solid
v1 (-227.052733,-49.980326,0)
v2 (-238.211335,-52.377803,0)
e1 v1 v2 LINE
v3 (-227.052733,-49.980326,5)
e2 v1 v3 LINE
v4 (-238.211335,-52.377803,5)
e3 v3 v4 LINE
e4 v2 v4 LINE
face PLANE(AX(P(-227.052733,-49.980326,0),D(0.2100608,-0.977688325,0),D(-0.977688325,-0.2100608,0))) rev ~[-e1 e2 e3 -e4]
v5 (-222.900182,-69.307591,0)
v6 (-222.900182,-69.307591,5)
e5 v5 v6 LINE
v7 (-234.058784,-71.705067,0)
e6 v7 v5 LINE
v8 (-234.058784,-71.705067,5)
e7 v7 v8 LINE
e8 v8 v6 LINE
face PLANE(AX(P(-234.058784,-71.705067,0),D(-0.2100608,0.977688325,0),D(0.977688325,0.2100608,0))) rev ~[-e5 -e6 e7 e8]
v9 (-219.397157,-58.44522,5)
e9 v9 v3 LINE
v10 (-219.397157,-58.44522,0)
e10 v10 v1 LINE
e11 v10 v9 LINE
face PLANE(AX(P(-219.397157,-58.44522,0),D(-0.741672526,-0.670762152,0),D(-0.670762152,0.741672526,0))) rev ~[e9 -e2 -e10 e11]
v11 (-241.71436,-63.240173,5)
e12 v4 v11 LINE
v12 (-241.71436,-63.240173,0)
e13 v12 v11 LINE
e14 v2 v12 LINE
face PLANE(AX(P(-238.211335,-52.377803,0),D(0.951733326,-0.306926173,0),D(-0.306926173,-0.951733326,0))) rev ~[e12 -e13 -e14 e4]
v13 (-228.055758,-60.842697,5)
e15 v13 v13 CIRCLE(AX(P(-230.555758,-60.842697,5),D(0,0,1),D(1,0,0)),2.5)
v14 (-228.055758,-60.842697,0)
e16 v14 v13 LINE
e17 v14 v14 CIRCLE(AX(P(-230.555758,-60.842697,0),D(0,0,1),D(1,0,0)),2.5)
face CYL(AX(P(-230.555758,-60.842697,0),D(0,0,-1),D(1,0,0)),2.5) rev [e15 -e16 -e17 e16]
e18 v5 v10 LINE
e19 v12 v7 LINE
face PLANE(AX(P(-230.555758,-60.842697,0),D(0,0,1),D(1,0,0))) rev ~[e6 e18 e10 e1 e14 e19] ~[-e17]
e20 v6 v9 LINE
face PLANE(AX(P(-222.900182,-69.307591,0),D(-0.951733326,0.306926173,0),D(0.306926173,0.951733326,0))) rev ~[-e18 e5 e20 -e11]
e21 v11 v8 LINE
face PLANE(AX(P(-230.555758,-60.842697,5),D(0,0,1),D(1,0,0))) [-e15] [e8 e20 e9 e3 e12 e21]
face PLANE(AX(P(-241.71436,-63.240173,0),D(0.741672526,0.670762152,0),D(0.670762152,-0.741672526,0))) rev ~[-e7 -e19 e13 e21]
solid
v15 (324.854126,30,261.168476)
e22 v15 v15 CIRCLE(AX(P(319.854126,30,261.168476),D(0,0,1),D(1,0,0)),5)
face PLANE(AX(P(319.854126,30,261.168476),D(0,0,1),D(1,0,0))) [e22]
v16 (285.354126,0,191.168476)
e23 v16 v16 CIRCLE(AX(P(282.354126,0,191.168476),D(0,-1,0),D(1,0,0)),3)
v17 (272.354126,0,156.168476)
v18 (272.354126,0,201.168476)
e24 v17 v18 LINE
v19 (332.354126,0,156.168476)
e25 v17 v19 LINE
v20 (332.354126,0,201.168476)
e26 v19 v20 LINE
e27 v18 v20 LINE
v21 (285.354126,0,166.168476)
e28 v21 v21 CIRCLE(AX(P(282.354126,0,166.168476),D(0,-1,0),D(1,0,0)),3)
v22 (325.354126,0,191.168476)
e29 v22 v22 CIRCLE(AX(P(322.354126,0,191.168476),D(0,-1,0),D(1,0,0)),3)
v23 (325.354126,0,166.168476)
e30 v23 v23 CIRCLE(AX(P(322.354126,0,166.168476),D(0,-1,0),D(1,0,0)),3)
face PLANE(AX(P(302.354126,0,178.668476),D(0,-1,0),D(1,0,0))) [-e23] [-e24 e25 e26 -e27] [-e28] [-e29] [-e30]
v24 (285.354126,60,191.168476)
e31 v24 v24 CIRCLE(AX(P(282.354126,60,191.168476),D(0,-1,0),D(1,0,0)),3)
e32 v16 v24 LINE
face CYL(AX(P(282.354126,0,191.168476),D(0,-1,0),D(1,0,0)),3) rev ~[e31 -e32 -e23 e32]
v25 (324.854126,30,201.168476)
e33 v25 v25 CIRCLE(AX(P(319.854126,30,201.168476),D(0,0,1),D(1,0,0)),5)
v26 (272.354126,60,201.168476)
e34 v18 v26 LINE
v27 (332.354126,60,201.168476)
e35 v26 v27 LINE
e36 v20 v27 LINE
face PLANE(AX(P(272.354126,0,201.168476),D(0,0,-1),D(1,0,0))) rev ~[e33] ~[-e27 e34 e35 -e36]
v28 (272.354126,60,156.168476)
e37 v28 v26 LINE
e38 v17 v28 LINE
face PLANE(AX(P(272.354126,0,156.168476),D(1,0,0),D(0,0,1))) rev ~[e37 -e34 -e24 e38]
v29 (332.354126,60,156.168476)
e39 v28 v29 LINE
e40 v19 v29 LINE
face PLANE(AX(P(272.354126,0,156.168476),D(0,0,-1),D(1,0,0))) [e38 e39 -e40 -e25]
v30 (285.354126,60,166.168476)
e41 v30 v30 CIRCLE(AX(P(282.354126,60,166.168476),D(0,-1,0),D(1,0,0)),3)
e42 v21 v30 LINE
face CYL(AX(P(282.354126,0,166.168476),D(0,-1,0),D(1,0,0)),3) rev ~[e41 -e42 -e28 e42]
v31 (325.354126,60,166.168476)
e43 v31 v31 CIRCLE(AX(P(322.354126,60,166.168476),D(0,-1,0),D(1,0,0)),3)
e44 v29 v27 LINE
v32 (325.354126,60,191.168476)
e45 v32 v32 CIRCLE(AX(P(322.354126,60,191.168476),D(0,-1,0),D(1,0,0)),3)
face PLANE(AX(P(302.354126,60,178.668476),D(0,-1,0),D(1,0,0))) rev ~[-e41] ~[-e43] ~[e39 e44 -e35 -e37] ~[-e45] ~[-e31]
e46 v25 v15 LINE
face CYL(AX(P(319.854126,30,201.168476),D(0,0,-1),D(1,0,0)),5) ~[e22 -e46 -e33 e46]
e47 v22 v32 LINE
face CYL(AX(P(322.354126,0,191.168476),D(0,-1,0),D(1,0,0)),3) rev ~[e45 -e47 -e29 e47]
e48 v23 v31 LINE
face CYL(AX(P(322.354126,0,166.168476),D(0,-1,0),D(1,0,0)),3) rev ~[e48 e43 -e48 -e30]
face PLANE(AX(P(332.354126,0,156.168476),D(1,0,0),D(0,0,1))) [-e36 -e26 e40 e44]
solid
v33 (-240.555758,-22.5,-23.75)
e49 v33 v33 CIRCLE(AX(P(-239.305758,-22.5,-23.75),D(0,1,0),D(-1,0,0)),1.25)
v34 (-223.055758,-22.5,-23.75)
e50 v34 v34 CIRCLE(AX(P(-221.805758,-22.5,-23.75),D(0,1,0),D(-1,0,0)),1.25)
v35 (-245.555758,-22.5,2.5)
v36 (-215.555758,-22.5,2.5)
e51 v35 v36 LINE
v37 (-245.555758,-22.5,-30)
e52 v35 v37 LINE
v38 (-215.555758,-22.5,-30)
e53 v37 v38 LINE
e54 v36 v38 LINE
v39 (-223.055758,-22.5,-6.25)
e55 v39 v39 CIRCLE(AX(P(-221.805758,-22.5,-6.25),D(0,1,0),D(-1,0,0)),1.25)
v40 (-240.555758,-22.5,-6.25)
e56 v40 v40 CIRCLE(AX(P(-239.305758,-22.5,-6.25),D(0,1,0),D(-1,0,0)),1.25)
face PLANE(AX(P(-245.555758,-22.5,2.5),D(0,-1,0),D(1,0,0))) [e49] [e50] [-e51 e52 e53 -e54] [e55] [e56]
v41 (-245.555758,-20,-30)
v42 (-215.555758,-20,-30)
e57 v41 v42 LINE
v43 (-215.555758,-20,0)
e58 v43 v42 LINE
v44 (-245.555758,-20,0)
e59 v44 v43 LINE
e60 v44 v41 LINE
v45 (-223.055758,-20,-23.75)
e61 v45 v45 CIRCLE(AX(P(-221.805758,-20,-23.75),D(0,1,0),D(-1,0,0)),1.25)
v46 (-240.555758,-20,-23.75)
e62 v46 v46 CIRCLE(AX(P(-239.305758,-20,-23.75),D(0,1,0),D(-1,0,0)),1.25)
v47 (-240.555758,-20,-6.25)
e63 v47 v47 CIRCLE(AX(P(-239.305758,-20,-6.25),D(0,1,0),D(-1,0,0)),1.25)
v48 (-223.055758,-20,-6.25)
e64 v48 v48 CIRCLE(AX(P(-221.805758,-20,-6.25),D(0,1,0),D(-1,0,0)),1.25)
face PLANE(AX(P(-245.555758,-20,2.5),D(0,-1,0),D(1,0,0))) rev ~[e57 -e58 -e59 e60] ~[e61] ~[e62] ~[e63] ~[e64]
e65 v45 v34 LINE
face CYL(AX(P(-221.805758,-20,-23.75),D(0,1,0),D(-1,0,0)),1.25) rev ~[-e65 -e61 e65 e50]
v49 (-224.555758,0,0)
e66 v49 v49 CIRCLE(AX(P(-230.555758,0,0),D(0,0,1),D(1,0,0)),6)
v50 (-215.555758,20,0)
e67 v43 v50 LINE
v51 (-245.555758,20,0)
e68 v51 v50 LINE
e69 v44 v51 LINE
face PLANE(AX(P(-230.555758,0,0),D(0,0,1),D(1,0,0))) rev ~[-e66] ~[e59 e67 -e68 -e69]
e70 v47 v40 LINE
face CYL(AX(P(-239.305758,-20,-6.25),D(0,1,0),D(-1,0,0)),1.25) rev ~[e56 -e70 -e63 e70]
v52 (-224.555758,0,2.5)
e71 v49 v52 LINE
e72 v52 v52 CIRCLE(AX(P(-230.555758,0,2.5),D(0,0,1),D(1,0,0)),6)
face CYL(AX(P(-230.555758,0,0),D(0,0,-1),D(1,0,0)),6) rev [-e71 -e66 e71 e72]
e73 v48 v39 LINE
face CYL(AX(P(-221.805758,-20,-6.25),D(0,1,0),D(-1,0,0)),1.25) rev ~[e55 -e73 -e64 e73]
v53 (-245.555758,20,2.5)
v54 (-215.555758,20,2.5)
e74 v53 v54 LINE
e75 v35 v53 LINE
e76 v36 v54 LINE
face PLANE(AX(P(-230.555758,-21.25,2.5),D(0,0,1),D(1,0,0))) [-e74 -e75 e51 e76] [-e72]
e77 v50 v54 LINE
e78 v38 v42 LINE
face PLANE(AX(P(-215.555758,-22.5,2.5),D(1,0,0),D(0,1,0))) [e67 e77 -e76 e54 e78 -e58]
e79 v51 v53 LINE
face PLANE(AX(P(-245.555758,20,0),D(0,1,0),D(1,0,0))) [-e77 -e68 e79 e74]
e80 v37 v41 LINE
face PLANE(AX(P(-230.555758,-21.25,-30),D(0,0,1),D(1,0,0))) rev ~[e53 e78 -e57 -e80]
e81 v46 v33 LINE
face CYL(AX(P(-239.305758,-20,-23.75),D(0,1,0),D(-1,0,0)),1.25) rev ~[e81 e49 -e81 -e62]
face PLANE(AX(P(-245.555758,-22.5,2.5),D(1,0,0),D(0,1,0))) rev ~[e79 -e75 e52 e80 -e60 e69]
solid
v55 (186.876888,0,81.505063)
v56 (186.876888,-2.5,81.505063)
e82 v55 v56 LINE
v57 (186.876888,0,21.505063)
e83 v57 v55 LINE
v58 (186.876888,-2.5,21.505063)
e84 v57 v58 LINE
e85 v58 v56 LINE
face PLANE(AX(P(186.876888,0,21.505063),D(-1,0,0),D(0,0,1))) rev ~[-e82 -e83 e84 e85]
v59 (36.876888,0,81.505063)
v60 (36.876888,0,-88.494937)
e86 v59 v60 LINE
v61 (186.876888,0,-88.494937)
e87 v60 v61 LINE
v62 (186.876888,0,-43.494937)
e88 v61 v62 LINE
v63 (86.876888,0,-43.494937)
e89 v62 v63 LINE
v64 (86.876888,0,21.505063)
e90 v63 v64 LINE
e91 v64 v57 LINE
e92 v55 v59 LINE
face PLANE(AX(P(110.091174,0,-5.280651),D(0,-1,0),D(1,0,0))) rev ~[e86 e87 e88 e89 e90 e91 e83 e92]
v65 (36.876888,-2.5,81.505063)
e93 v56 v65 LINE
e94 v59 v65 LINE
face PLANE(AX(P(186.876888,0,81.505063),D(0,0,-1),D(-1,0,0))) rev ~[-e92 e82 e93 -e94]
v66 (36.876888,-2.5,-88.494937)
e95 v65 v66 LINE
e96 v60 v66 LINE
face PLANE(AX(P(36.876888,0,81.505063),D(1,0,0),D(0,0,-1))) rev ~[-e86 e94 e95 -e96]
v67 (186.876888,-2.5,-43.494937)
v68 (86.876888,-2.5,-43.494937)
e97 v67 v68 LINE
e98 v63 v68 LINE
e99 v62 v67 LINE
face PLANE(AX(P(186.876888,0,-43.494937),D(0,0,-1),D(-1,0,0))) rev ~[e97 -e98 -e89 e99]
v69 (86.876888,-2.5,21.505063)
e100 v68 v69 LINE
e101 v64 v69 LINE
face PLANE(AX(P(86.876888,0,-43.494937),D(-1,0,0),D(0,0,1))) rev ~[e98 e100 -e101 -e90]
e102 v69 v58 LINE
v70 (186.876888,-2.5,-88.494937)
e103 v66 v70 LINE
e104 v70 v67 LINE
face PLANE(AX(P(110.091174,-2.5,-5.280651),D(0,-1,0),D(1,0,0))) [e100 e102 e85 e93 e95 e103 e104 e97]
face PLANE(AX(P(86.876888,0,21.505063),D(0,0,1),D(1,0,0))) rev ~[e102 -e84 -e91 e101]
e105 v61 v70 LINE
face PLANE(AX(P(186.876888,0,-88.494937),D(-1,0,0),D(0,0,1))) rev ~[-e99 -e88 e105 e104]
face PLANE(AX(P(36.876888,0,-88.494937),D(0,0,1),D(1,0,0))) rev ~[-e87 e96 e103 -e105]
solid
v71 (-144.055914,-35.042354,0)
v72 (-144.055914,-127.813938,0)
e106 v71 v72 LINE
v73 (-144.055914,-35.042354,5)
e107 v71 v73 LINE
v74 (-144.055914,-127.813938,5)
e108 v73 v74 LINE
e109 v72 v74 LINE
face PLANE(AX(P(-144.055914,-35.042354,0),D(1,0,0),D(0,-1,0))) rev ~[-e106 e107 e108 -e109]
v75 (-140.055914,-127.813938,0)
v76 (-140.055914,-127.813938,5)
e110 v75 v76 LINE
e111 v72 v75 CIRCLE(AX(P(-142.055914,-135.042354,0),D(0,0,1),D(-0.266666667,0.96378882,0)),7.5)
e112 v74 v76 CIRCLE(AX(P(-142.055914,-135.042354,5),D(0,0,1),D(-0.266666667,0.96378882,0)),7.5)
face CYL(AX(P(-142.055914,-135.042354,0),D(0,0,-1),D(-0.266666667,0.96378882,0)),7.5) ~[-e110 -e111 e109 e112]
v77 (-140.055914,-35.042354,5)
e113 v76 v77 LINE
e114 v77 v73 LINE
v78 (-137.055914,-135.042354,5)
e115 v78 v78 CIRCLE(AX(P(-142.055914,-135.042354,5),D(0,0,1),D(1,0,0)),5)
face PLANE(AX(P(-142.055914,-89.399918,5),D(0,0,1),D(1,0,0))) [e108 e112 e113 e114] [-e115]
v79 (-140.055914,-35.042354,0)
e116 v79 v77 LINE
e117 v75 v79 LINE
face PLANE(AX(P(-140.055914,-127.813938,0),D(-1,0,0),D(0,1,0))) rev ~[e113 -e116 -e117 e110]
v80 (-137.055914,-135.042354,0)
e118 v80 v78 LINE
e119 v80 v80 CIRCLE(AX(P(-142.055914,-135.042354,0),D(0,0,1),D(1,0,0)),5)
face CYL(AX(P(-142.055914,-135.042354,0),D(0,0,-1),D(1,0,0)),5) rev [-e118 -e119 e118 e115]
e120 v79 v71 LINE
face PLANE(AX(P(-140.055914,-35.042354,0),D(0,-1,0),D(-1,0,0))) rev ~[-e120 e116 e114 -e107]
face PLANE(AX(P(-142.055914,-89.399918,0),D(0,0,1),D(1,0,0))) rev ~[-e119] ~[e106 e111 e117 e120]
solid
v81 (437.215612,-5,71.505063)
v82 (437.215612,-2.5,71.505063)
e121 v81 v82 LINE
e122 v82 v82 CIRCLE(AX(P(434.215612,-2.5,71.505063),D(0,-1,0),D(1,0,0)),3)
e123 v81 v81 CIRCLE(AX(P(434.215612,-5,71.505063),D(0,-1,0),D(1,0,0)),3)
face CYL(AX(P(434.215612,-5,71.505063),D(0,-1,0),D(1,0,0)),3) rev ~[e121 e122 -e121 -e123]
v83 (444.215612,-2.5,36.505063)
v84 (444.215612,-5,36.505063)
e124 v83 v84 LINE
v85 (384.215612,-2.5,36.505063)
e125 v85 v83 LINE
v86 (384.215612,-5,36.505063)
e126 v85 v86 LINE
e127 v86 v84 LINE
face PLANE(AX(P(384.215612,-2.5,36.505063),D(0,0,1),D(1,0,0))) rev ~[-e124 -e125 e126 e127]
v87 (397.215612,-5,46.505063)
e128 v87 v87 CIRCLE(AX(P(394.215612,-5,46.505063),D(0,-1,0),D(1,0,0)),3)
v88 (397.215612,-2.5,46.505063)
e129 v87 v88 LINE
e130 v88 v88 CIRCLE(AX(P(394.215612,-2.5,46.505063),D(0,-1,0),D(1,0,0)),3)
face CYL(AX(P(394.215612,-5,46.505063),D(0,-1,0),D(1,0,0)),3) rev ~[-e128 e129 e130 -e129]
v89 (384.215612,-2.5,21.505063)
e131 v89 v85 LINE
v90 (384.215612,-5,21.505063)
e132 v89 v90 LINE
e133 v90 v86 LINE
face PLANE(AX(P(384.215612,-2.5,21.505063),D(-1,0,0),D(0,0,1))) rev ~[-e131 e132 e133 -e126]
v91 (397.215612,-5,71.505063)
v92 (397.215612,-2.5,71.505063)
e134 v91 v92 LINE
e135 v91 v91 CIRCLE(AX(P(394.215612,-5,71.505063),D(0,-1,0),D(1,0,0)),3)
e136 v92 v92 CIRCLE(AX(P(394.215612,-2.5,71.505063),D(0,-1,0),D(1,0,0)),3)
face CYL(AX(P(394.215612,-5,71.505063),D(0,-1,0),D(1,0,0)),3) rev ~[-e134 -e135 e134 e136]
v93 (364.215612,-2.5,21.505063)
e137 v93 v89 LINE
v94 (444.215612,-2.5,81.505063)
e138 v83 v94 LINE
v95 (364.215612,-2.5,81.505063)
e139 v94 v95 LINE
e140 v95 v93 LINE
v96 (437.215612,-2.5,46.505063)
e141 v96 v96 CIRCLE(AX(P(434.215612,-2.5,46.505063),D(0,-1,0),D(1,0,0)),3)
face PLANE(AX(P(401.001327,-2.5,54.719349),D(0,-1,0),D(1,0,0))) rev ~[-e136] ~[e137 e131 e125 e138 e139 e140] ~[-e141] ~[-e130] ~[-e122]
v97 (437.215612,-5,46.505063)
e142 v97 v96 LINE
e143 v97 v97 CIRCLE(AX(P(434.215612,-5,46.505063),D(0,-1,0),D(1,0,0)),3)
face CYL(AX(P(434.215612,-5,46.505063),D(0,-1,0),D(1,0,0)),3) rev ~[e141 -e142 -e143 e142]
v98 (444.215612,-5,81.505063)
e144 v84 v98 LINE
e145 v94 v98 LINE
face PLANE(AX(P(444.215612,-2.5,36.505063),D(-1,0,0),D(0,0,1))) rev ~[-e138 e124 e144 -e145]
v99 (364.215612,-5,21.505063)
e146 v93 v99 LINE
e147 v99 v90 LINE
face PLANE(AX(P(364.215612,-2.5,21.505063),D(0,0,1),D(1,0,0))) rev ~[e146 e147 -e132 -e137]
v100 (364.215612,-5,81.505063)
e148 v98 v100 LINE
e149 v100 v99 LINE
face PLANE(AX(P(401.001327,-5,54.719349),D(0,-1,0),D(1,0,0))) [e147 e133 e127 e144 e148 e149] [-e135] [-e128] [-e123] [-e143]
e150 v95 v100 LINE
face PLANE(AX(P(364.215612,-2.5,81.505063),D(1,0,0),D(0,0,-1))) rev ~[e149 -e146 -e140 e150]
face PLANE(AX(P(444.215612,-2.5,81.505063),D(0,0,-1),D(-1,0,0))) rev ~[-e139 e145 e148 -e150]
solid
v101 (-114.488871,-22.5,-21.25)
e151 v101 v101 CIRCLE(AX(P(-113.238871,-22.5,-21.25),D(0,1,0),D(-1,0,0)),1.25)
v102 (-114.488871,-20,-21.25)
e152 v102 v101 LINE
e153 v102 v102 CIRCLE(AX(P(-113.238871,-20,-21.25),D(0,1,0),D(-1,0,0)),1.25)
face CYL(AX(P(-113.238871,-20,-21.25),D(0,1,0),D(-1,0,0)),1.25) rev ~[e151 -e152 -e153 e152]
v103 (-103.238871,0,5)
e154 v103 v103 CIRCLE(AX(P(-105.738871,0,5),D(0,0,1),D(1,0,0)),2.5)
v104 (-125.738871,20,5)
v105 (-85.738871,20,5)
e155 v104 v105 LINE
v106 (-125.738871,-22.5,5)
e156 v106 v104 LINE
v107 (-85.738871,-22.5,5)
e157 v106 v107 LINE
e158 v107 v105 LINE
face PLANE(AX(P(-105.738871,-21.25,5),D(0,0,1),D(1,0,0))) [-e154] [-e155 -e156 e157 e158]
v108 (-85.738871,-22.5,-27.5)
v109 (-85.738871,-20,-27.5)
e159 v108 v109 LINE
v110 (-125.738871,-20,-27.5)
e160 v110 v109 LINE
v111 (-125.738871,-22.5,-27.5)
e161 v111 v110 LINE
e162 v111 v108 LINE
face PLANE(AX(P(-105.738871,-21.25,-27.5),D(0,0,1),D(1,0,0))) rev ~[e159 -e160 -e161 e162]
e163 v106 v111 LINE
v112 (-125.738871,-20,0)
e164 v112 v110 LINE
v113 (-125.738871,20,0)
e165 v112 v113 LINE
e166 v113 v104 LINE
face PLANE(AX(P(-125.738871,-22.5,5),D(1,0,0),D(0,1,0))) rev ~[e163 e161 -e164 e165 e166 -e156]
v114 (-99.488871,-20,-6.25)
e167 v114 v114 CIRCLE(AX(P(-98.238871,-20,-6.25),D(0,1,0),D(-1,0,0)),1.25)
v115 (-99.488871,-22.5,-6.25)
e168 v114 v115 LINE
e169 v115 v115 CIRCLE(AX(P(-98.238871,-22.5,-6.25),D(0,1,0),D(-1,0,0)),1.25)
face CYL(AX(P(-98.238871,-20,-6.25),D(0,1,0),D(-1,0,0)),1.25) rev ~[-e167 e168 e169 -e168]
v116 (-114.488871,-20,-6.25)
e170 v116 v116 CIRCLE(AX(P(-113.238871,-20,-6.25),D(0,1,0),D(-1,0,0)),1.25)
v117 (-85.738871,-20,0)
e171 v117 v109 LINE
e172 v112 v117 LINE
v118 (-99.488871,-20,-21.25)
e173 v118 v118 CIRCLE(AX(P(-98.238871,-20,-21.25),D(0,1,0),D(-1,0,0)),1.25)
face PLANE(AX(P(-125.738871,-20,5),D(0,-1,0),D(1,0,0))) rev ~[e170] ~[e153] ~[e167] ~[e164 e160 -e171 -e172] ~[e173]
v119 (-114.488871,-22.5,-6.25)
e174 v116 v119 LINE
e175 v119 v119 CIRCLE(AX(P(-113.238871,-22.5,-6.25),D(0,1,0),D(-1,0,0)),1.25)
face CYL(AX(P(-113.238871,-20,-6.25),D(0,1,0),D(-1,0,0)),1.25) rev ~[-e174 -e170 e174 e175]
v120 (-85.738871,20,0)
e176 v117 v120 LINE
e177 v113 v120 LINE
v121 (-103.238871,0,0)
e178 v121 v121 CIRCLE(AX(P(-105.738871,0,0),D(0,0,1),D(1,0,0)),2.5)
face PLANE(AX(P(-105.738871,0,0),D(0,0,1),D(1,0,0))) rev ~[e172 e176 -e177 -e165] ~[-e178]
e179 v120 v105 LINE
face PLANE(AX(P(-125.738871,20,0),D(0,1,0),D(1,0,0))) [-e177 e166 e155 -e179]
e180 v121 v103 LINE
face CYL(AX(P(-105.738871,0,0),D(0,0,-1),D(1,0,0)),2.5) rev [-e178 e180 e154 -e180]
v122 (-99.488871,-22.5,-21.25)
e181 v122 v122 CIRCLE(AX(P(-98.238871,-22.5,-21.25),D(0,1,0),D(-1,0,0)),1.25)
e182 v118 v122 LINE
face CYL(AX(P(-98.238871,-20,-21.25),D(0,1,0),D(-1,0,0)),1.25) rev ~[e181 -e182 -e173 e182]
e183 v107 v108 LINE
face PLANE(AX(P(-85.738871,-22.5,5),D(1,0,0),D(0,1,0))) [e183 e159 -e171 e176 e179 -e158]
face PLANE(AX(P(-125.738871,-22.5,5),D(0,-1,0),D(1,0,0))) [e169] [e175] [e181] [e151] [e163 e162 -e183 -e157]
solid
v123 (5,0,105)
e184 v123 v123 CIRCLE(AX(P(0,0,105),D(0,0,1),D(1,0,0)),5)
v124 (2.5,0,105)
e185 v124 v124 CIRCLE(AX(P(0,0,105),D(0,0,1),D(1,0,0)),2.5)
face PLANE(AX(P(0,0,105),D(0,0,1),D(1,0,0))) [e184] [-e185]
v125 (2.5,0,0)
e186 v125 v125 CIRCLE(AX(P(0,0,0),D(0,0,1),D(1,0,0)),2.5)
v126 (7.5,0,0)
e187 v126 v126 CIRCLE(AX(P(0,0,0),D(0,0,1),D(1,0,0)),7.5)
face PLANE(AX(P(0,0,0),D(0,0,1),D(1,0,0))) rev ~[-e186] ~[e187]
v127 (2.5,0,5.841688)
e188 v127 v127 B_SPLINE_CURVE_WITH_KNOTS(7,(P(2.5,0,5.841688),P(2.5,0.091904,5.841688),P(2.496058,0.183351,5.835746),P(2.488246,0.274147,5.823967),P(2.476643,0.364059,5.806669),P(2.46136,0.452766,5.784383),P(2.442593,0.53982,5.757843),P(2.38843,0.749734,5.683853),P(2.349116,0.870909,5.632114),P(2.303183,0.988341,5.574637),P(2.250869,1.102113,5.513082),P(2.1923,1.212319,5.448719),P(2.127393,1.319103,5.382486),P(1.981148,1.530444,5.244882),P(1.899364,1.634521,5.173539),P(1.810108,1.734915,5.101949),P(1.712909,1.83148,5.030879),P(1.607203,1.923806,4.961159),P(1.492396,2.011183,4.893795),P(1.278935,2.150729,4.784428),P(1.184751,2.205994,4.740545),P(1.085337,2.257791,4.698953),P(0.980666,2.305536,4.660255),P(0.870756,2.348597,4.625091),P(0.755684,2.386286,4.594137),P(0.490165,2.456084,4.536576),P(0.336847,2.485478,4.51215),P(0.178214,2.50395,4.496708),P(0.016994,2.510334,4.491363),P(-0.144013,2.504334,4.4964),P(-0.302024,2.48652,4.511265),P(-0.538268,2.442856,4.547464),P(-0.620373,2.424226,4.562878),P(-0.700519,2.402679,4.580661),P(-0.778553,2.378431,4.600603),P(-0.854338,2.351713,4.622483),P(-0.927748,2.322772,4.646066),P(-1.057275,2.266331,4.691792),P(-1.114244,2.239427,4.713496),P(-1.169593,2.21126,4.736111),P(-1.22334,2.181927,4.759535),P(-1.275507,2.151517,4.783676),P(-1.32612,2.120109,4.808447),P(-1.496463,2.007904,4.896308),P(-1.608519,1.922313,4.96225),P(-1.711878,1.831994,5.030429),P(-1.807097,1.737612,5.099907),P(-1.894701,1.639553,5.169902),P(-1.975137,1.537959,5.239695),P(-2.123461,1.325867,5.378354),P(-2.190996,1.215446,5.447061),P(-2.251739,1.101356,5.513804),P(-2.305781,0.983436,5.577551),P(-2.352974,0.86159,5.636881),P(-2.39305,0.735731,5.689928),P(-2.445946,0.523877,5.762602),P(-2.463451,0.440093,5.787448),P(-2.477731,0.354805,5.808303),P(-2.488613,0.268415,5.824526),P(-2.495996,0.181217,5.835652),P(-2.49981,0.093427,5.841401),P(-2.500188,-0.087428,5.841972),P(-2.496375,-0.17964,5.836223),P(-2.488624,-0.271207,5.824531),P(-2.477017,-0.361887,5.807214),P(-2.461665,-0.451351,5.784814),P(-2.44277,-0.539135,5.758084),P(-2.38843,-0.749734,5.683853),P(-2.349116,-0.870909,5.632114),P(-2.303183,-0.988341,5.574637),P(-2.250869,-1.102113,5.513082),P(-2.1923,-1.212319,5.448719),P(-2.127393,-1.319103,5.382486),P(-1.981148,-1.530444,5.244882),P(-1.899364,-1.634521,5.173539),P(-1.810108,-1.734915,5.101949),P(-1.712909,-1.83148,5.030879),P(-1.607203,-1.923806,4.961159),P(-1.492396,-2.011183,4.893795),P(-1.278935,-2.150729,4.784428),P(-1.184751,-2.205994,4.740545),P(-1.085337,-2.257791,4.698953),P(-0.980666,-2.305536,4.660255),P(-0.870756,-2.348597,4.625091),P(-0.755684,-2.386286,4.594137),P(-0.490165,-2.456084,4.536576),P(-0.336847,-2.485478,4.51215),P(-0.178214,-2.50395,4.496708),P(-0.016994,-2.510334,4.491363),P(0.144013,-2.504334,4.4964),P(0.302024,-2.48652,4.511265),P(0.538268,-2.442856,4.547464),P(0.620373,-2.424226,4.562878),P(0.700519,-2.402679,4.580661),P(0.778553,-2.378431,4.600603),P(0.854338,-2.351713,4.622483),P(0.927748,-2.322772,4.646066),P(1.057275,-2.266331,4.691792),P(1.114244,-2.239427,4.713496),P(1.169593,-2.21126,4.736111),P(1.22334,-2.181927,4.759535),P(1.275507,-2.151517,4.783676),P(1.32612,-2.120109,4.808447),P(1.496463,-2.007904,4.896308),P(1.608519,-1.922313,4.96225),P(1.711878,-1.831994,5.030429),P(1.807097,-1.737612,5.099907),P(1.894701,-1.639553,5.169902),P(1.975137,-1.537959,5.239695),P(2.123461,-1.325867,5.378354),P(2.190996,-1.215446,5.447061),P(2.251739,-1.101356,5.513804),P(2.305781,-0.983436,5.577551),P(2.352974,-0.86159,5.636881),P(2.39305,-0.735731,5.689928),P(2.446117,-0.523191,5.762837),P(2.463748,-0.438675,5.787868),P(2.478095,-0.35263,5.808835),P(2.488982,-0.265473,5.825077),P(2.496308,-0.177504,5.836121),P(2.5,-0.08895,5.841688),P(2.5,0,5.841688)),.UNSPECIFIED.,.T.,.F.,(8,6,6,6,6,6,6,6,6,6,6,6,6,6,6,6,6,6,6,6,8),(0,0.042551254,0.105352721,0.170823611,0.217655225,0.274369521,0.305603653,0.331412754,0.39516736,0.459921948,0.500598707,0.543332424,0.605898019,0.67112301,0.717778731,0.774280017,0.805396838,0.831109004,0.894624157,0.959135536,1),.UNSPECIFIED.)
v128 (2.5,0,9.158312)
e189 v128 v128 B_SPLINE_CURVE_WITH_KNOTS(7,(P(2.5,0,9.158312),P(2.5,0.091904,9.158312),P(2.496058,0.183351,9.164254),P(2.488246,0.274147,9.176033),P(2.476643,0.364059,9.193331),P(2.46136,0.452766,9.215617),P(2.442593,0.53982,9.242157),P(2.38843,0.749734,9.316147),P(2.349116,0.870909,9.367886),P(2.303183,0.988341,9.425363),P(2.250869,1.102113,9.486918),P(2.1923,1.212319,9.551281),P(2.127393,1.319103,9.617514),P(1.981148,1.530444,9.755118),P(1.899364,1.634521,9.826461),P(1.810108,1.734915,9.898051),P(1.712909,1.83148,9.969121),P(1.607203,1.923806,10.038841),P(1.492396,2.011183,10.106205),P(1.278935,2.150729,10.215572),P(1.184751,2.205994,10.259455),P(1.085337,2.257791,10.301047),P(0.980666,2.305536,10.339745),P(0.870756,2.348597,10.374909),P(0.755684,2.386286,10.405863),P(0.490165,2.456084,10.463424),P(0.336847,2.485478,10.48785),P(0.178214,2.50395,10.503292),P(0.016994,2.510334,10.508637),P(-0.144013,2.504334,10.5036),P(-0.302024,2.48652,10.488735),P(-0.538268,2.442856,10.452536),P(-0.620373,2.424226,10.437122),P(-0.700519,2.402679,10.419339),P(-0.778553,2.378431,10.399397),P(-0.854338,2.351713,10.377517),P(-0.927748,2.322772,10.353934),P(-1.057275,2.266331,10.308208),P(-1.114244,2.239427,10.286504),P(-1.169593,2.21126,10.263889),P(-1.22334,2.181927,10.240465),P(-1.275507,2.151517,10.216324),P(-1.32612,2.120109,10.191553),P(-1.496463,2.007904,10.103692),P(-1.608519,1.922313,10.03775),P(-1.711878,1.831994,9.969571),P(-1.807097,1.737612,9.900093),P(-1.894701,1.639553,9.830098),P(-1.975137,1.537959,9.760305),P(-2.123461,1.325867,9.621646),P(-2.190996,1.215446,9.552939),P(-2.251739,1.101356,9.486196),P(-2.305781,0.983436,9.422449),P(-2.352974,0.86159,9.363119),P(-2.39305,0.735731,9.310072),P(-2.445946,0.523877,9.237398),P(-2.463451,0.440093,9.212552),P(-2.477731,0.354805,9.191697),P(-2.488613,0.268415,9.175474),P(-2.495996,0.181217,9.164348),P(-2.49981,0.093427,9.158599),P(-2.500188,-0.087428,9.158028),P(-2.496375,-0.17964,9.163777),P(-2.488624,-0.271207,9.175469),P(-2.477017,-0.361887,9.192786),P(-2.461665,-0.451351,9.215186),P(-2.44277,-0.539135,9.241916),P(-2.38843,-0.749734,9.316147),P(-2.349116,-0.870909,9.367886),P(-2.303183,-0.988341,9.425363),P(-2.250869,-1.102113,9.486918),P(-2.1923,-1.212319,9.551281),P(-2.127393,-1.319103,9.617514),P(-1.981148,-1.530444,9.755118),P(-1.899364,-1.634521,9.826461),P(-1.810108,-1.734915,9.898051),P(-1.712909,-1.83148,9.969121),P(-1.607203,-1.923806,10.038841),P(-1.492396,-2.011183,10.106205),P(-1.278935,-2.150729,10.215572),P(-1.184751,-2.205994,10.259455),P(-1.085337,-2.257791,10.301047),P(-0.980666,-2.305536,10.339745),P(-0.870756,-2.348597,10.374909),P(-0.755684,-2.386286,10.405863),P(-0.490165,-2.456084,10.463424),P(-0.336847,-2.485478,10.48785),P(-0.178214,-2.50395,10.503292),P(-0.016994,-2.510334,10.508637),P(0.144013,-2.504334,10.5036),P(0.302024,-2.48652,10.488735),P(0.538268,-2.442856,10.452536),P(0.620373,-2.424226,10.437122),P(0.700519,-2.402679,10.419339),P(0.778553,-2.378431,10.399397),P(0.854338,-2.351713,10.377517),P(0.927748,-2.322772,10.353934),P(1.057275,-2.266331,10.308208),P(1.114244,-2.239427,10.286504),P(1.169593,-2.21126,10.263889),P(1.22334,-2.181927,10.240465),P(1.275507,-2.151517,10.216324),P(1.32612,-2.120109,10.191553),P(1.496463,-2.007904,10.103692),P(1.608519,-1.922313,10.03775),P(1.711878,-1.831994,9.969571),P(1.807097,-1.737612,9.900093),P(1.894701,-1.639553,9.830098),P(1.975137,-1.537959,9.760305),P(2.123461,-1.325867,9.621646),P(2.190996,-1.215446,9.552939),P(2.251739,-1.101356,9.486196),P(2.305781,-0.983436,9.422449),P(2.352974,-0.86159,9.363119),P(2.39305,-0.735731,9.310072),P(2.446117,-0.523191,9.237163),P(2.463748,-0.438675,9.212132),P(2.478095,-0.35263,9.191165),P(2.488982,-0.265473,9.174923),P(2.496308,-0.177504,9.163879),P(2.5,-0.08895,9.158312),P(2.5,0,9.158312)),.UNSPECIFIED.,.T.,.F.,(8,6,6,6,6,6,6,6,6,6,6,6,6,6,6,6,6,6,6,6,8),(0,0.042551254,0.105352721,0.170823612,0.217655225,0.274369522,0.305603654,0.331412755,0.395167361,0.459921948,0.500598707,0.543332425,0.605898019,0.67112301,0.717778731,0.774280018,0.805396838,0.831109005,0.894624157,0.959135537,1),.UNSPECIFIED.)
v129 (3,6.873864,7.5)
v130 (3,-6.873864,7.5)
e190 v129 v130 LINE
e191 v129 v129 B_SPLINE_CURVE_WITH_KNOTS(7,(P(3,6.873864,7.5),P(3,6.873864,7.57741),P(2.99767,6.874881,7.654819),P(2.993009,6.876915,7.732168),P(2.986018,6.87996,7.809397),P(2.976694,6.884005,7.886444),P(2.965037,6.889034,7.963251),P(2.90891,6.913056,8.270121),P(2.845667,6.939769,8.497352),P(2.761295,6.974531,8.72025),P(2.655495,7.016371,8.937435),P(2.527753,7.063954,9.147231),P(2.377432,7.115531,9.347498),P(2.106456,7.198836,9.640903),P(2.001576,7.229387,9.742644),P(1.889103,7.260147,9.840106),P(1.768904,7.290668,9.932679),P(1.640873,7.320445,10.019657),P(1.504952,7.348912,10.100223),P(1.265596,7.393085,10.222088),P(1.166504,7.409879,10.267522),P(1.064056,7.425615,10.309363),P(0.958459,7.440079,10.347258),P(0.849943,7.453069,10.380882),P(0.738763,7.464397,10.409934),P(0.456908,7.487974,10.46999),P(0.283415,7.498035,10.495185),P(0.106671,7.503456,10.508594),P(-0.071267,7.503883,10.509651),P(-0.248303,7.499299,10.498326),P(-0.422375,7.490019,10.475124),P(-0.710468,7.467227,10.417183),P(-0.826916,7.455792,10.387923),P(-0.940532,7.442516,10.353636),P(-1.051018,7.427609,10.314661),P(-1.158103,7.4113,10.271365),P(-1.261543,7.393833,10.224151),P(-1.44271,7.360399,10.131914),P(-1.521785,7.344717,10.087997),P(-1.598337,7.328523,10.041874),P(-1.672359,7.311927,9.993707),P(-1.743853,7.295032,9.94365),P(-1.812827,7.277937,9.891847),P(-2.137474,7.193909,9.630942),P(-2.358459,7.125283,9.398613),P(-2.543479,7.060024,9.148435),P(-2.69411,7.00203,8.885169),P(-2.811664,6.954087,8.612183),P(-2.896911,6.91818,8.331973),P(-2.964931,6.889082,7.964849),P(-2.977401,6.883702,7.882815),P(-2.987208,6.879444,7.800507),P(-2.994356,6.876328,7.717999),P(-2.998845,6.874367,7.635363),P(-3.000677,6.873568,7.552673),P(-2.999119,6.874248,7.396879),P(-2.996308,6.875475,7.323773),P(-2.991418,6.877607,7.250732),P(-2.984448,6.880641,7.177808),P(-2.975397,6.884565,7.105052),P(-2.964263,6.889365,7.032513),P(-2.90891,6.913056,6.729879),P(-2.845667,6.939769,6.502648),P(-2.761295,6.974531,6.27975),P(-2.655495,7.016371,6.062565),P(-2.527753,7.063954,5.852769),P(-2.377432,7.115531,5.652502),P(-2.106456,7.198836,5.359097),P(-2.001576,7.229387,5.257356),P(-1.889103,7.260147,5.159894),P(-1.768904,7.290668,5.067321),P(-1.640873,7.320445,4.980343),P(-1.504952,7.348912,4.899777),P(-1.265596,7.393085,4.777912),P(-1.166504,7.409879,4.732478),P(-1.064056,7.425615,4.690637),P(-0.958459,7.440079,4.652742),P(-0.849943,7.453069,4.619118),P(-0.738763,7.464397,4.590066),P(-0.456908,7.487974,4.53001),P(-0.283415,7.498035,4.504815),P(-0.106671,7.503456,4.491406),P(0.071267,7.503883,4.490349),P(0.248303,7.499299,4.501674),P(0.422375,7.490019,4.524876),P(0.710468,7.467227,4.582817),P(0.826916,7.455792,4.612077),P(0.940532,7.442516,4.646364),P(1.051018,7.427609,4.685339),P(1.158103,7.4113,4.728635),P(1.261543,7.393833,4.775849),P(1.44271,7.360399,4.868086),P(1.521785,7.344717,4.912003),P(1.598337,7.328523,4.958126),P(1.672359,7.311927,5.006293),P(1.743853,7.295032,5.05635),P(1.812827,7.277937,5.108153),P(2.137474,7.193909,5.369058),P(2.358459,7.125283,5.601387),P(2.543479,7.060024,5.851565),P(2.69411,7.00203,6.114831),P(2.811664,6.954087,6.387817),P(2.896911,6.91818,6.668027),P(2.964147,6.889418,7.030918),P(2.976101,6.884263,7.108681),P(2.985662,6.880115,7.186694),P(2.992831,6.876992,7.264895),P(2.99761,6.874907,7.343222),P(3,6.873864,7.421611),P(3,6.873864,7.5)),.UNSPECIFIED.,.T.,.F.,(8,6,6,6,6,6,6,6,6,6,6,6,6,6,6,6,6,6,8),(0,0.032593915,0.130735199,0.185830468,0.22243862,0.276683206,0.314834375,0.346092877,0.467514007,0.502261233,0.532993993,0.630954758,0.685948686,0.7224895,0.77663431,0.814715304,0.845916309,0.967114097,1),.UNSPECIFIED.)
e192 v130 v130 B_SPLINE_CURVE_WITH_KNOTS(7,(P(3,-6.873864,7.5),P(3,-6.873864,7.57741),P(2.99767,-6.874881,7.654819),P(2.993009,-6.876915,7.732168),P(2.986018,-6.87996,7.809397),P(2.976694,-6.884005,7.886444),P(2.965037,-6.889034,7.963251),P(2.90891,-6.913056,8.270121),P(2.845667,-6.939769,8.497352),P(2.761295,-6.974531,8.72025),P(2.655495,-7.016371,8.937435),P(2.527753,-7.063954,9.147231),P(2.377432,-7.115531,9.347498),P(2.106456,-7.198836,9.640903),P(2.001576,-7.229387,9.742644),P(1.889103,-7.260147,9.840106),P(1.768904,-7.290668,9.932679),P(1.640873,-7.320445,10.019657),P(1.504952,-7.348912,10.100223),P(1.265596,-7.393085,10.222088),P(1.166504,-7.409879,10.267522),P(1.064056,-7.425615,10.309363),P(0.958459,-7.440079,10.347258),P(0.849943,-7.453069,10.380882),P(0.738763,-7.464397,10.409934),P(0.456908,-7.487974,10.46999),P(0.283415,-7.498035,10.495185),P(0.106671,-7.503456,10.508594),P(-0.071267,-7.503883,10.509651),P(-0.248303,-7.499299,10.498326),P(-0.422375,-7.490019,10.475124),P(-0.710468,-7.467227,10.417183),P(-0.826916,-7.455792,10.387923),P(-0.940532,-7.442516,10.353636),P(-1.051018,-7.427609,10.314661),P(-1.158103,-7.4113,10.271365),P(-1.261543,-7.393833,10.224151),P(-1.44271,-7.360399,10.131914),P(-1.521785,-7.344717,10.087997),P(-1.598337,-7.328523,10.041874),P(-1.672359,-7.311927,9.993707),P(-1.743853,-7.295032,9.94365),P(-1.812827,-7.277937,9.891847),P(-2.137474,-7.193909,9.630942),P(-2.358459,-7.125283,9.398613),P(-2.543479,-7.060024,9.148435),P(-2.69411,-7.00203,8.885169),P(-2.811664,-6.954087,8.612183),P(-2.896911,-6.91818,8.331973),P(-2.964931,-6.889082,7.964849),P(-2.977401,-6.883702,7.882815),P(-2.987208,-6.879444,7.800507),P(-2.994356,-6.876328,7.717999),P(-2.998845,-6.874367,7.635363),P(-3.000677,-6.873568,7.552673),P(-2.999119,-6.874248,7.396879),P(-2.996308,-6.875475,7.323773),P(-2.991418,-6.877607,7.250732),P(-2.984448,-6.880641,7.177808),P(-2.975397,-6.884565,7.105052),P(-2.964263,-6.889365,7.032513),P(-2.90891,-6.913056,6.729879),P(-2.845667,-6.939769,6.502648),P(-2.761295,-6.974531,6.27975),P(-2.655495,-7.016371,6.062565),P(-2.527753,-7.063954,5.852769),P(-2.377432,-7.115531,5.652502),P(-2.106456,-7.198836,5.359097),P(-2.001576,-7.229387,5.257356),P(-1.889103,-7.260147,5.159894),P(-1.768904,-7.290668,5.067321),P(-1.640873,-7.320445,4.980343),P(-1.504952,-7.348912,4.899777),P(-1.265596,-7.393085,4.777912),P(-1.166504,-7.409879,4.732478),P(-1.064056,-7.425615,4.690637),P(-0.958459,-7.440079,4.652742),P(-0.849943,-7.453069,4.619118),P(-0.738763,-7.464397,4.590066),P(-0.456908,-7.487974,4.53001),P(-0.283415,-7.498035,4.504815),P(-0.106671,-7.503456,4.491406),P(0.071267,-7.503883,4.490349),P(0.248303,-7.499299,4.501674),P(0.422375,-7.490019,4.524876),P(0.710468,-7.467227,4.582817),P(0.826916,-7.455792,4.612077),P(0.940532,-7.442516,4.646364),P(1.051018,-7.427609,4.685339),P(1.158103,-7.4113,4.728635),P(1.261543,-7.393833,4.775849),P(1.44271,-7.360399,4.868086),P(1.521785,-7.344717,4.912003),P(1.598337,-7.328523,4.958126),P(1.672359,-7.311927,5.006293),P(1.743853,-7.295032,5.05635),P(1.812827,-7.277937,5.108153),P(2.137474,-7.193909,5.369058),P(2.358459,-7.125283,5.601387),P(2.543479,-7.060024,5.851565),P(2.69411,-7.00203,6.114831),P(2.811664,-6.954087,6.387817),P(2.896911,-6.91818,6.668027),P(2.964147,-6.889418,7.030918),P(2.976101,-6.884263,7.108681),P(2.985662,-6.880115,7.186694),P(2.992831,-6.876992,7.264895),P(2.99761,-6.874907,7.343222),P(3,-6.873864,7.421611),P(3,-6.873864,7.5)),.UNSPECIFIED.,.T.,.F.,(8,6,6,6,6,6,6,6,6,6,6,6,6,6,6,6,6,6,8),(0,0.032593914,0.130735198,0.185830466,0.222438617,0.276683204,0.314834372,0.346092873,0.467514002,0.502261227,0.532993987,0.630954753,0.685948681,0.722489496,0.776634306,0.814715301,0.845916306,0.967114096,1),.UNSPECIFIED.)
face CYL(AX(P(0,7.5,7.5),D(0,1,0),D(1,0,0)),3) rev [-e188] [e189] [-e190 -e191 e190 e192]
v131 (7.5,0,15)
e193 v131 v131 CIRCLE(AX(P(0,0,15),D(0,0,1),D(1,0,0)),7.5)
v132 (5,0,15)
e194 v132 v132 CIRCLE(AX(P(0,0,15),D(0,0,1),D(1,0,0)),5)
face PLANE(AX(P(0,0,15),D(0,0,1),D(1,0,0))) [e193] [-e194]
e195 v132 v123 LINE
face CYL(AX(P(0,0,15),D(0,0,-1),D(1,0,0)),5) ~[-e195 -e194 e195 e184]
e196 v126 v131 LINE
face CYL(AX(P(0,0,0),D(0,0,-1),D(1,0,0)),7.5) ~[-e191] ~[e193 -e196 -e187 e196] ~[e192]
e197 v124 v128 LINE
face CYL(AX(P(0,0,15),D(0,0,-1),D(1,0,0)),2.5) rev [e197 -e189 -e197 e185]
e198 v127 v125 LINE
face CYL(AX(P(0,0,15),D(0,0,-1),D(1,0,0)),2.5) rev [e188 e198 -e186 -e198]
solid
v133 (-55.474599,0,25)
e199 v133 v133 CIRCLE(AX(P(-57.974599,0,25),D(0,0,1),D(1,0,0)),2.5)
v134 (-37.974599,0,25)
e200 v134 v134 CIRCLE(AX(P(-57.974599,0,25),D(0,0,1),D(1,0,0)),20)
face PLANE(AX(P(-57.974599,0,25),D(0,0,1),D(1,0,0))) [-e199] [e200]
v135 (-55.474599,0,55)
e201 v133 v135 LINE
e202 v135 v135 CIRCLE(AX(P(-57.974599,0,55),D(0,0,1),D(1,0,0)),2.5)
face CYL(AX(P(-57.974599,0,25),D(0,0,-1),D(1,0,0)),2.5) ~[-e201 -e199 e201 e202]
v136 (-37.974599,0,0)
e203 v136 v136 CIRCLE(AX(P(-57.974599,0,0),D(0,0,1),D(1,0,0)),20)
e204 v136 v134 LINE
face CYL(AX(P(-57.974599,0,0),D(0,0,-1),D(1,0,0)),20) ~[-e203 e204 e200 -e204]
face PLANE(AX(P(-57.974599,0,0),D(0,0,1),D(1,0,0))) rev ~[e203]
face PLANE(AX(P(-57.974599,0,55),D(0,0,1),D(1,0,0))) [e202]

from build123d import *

# Parameters (mm, degrees)
F0_R      = 2.5
F1_DEPTH  = 15
F2_R      = 5
F2_R_2    = 2.5
F3_DEPTH  = 90
F5_R      = 3
F6_DEPTH  = 15.001
F0_R_2    = 20
F7_DEPTH  = 25
F8_R      = 2.5
F9_DEPTH  = 30
F0_W      = 40
F0_H      = 40
F10_DEPTH = 5
F11_W     = 40
F11_H     = 2.5
F12_DEPTH = 32.5
F14_DEPTH = 2.5
F0_W_2    = 30
F0_R_3    = 6
F16_DEPTH = 2.5
F17_W     = 30
F17_H     = 2.5
F18_DEPTH = 32.5
F19_DEPTH = 5
F20_R     = 1.25
F21_DEPTH = 2.5
F22_R     = 1.25
F23_DEPTH = 2.5
F13_W     = 60
F13_H     = 45
F13_R     = 3
F24_DEPTH = 60
F25_R     = 5
F26_DEPTH = 60
F27_DEPTH = 2.5
F28_R     = 3
F29_DEPTH = 25
F0_R_4    = 5
F30_DEPTH = 5


with BuildPart() as f1:
    # F0 (on Top) → F1 (new body)
    with BuildSketch(Plane.XY):
        with BuildLine():
            ThreePointArc((0, 7.5), (-5.3033008589, -5.3033008589), (7.5, 0))
            ThreePointArc((7.5, 0), (5.3033008589, 5.3033008589), (0, 7.5))
        make_face()
        Circle(F0_R, mode=Mode.SUBTRACT)
    extrude(amount=F1_DEPTH)

    # F2 (on face) → F3 (join)
    with BuildSketch(Plane.XY.offset(15)):
        Circle(F2_R)
        Circle(F2_R_2, mode=Mode.SUBTRACT)
    extrude(amount=F3_DEPTH)

    # F5 (on face) → F6 (cut, through all)
    with BuildSketch(Plane.XZ.offset(-7.5)):
        with Locations((0, 7.5)):
            Circle(F5_R)
    extrude(amount=F6_DEPTH, mode=Mode.SUBTRACT)


with BuildPart() as f7:
    # F0 (on Top) → F7 (new body)
    with BuildSketch(Plane.XY):
        with Locations((-57.9745993018, 0)):
            Circle(F0_R_2)
    extrude(amount=F7_DEPTH)

    # F8 (on face) → F9 (join)
    with BuildSketch(Plane.XY.offset(25)):
        with Locations((-57.9745993018, 0)):
            Circle(F8_R)
    extrude(amount=F9_DEPTH)


with BuildPart() as f10:
    # F0 (on Top) → F10 (new body)
    with BuildSketch(Plane.XY):
        with Locations((-105.7388707995, 0)):
            Rectangle(F0_W, F0_H)
        with Locations((-105.7388707995, 0)):
            Circle(F0_R, mode=Mode.SUBTRACT)
    extrude(amount=F10_DEPTH)

    # F11 (on face) → F12 (join)
    with BuildSketch(Plane.XY.offset(5)):
        with Locations((-105.7388707995, -21.25)):
            Rectangle(F11_W, F11_H)
    extrude(amount=-F12_DEPTH)

    # F20 (on face) → F21 (cut, through all)
    with BuildSketch(Plane(origin=(0, -20, 0), x_dir=(-1, 0, 0), z_dir=(0, 1, 0))):
        with Locations((98.2388707995, -6.25)):
            Circle(F20_R)
        with Locations((113.2388707995, -6.25)):
            Circle(F20_R)
        with Locations((113.2388707995, -21.25)):
            Circle(F20_R)
        with Locations((98.2388707995, -21.25)):
            Circle(F20_R)
    extrude(amount=-F21_DEPTH, mode=Mode.SUBTRACT)


with BuildPart() as f14:
    # F13 (on Front) → F14 (new body)
    with BuildSketch(Plane.XZ):
        Polygon((186.8768878281, 81.5050628316), (36.8768878281, 81.5050628316), (36.8768878281, -88.4949371684), (186.8768878281, -88.4949371684), (186.8768878281, -43.4949371684), (86.8768878281, -43.4949371684), (86.8768878281, 21.5050628316), (186.8768878281, 21.5050628316), align=None)
    extrude(amount=F14_DEPTH)


with BuildPart() as f16:
    # F0 (on Top) → F16 (new body)
    with BuildSketch(Plane.XY):
        with Locations((-230.5557584763, 0)):
            Rectangle(F0_W_2, F0_H)
        with Locations((-230.5557584763, 0)):
            Circle(F0_R_3, mode=Mode.SUBTRACT)
    extrude(amount=F16_DEPTH)

    # F17 (on face) → F18 (join)
    with BuildSketch(Plane.XY.offset(2.5)):
        with Locations((-230.5557584763, -21.25)):
            Rectangle(F17_W, F17_H)
    extrude(amount=-F18_DEPTH)

    # F22 (on face) → F23 (cut, through all)
    with BuildSketch(Plane(origin=(0, -20, 0), x_dir=(-1, 0, 0), z_dir=(0, 1, 0))):
        with Locations((221.8057584763, -6.25)):
            Circle(F22_R)
        with Locations((221.8057584763, -23.75)):
            Circle(F22_R)
        with Locations((239.3057584763, -23.75)):
            Circle(F22_R)
        with Locations((239.3057584763, -6.25)):
            Circle(F22_R)
    extrude(amount=-F23_DEPTH, mode=Mode.SUBTRACT)


with BuildPart() as f19:
    # F0 (on Top) → F19 (new body)
    with BuildSketch(Plane.XY):
        Polygon((-222.9001823011, -69.3075905842), (-219.3971571383, -58.4452201324), (-227.0527333135, -49.9803261255), (-238.2113346515, -52.3778025704), (-241.7143598142, -63.2401730222), (-234.058783639, -71.7050670291), align=None)
        with Locations((-230.5557584763, -60.8426965773)):
            Circle(F0_R, mode=Mode.SUBTRACT)
    extrude(amount=F19_DEPTH)


with BuildPart() as f24:
    # F13 (on Front) → F24 (new body)
    with BuildSketch(Plane.XZ):
        with Locations((302.3541259766, 178.6684757471)):
            Rectangle(F13_W, F13_H)
        with Locations((282.3541259766, 166.1684757471)):
            Circle(F13_R, mode=Mode.SUBTRACT)
        with Locations((282.3541259766, 191.1684757471)):
            Circle(F13_R, mode=Mode.SUBTRACT)
        with Locations((322.3541259766, 166.1684757471)):
            Circle(F13_R, mode=Mode.SUBTRACT)
        with Locations((322.3541259766, 191.1684757471)):
            Circle(F13_R, mode=Mode.SUBTRACT)
    extrude(amount=-F24_DEPTH)

    # F25 (on face) → F26 (join)
    with BuildSketch(Plane.XY.offset(201.1684757471)):
        with Locations((319.8541259766, 30)):
            Circle(F25_R)
    extrude(amount=F26_DEPTH)


with BuildPart() as f27:
    # F15 (on face) → F27 (new body)
    with BuildSketch(Plane.XZ.offset(2.5)):
        Polygon((444.2156124115, 81.5050628316), (364.2156124115, 81.5050628316), (364.2156124115, 21.5050628316), (384.2156124115, 21.5050628316), (384.2156124115, 36.5050628316), (444.2156124115, 36.5050628316), align=None)
    extrude(amount=F27_DEPTH)

    # F28 (on face) → F29 (cut)
    with BuildSketch(Plane.XZ.offset(5)):
        with Locations((394.2156124115, 71.5050628316)):
            Circle(F28_R)
        with Locations((394.2156124115, 46.5050628316)):
            Circle(F28_R)
        with Locations((434.2156124115, 71.5050628316)):
            Circle(F28_R)
        with Locations((434.2156124115, 46.5050628316)):
            Circle(F28_R)
    extrude(amount=-F29_DEPTH, mode=Mode.SUBTRACT)


with BuildPart() as f30:
    # F0 (on Top) → F30 (new body)
    with BuildSketch(Plane.XY):
        with BuildLine():
            Line((-144.055913806, -35.0423544645), (-144.055913806, -127.8139383171))
            ThreePointArc((-144.055913806, -127.8139383171), (-142.055913806, -142.5423544645), (-140.055913806, -127.8139383171))
            Line((-140.055913806, -127.8139383171), (-140.055913806, -35.0423544645))
            Line((-140.055913806, -35.0423544645), (-142.055913806, -35.0423544645))
            Line((-142.055913806, -35.0423544645), (-144.055913806, -35.0423544645))
        make_face()
        with Locations((-142.055913806, -135.0423544645)):
            Circle(F0_R_4, mode=Mode.SUBTRACT)
    extrude(amount=F30_DEPTH)


solid = Compound([f1.part, f7.part, f10.part, f14.part, f16.part, f19.part, f24.part, f27.part, f30.part])
